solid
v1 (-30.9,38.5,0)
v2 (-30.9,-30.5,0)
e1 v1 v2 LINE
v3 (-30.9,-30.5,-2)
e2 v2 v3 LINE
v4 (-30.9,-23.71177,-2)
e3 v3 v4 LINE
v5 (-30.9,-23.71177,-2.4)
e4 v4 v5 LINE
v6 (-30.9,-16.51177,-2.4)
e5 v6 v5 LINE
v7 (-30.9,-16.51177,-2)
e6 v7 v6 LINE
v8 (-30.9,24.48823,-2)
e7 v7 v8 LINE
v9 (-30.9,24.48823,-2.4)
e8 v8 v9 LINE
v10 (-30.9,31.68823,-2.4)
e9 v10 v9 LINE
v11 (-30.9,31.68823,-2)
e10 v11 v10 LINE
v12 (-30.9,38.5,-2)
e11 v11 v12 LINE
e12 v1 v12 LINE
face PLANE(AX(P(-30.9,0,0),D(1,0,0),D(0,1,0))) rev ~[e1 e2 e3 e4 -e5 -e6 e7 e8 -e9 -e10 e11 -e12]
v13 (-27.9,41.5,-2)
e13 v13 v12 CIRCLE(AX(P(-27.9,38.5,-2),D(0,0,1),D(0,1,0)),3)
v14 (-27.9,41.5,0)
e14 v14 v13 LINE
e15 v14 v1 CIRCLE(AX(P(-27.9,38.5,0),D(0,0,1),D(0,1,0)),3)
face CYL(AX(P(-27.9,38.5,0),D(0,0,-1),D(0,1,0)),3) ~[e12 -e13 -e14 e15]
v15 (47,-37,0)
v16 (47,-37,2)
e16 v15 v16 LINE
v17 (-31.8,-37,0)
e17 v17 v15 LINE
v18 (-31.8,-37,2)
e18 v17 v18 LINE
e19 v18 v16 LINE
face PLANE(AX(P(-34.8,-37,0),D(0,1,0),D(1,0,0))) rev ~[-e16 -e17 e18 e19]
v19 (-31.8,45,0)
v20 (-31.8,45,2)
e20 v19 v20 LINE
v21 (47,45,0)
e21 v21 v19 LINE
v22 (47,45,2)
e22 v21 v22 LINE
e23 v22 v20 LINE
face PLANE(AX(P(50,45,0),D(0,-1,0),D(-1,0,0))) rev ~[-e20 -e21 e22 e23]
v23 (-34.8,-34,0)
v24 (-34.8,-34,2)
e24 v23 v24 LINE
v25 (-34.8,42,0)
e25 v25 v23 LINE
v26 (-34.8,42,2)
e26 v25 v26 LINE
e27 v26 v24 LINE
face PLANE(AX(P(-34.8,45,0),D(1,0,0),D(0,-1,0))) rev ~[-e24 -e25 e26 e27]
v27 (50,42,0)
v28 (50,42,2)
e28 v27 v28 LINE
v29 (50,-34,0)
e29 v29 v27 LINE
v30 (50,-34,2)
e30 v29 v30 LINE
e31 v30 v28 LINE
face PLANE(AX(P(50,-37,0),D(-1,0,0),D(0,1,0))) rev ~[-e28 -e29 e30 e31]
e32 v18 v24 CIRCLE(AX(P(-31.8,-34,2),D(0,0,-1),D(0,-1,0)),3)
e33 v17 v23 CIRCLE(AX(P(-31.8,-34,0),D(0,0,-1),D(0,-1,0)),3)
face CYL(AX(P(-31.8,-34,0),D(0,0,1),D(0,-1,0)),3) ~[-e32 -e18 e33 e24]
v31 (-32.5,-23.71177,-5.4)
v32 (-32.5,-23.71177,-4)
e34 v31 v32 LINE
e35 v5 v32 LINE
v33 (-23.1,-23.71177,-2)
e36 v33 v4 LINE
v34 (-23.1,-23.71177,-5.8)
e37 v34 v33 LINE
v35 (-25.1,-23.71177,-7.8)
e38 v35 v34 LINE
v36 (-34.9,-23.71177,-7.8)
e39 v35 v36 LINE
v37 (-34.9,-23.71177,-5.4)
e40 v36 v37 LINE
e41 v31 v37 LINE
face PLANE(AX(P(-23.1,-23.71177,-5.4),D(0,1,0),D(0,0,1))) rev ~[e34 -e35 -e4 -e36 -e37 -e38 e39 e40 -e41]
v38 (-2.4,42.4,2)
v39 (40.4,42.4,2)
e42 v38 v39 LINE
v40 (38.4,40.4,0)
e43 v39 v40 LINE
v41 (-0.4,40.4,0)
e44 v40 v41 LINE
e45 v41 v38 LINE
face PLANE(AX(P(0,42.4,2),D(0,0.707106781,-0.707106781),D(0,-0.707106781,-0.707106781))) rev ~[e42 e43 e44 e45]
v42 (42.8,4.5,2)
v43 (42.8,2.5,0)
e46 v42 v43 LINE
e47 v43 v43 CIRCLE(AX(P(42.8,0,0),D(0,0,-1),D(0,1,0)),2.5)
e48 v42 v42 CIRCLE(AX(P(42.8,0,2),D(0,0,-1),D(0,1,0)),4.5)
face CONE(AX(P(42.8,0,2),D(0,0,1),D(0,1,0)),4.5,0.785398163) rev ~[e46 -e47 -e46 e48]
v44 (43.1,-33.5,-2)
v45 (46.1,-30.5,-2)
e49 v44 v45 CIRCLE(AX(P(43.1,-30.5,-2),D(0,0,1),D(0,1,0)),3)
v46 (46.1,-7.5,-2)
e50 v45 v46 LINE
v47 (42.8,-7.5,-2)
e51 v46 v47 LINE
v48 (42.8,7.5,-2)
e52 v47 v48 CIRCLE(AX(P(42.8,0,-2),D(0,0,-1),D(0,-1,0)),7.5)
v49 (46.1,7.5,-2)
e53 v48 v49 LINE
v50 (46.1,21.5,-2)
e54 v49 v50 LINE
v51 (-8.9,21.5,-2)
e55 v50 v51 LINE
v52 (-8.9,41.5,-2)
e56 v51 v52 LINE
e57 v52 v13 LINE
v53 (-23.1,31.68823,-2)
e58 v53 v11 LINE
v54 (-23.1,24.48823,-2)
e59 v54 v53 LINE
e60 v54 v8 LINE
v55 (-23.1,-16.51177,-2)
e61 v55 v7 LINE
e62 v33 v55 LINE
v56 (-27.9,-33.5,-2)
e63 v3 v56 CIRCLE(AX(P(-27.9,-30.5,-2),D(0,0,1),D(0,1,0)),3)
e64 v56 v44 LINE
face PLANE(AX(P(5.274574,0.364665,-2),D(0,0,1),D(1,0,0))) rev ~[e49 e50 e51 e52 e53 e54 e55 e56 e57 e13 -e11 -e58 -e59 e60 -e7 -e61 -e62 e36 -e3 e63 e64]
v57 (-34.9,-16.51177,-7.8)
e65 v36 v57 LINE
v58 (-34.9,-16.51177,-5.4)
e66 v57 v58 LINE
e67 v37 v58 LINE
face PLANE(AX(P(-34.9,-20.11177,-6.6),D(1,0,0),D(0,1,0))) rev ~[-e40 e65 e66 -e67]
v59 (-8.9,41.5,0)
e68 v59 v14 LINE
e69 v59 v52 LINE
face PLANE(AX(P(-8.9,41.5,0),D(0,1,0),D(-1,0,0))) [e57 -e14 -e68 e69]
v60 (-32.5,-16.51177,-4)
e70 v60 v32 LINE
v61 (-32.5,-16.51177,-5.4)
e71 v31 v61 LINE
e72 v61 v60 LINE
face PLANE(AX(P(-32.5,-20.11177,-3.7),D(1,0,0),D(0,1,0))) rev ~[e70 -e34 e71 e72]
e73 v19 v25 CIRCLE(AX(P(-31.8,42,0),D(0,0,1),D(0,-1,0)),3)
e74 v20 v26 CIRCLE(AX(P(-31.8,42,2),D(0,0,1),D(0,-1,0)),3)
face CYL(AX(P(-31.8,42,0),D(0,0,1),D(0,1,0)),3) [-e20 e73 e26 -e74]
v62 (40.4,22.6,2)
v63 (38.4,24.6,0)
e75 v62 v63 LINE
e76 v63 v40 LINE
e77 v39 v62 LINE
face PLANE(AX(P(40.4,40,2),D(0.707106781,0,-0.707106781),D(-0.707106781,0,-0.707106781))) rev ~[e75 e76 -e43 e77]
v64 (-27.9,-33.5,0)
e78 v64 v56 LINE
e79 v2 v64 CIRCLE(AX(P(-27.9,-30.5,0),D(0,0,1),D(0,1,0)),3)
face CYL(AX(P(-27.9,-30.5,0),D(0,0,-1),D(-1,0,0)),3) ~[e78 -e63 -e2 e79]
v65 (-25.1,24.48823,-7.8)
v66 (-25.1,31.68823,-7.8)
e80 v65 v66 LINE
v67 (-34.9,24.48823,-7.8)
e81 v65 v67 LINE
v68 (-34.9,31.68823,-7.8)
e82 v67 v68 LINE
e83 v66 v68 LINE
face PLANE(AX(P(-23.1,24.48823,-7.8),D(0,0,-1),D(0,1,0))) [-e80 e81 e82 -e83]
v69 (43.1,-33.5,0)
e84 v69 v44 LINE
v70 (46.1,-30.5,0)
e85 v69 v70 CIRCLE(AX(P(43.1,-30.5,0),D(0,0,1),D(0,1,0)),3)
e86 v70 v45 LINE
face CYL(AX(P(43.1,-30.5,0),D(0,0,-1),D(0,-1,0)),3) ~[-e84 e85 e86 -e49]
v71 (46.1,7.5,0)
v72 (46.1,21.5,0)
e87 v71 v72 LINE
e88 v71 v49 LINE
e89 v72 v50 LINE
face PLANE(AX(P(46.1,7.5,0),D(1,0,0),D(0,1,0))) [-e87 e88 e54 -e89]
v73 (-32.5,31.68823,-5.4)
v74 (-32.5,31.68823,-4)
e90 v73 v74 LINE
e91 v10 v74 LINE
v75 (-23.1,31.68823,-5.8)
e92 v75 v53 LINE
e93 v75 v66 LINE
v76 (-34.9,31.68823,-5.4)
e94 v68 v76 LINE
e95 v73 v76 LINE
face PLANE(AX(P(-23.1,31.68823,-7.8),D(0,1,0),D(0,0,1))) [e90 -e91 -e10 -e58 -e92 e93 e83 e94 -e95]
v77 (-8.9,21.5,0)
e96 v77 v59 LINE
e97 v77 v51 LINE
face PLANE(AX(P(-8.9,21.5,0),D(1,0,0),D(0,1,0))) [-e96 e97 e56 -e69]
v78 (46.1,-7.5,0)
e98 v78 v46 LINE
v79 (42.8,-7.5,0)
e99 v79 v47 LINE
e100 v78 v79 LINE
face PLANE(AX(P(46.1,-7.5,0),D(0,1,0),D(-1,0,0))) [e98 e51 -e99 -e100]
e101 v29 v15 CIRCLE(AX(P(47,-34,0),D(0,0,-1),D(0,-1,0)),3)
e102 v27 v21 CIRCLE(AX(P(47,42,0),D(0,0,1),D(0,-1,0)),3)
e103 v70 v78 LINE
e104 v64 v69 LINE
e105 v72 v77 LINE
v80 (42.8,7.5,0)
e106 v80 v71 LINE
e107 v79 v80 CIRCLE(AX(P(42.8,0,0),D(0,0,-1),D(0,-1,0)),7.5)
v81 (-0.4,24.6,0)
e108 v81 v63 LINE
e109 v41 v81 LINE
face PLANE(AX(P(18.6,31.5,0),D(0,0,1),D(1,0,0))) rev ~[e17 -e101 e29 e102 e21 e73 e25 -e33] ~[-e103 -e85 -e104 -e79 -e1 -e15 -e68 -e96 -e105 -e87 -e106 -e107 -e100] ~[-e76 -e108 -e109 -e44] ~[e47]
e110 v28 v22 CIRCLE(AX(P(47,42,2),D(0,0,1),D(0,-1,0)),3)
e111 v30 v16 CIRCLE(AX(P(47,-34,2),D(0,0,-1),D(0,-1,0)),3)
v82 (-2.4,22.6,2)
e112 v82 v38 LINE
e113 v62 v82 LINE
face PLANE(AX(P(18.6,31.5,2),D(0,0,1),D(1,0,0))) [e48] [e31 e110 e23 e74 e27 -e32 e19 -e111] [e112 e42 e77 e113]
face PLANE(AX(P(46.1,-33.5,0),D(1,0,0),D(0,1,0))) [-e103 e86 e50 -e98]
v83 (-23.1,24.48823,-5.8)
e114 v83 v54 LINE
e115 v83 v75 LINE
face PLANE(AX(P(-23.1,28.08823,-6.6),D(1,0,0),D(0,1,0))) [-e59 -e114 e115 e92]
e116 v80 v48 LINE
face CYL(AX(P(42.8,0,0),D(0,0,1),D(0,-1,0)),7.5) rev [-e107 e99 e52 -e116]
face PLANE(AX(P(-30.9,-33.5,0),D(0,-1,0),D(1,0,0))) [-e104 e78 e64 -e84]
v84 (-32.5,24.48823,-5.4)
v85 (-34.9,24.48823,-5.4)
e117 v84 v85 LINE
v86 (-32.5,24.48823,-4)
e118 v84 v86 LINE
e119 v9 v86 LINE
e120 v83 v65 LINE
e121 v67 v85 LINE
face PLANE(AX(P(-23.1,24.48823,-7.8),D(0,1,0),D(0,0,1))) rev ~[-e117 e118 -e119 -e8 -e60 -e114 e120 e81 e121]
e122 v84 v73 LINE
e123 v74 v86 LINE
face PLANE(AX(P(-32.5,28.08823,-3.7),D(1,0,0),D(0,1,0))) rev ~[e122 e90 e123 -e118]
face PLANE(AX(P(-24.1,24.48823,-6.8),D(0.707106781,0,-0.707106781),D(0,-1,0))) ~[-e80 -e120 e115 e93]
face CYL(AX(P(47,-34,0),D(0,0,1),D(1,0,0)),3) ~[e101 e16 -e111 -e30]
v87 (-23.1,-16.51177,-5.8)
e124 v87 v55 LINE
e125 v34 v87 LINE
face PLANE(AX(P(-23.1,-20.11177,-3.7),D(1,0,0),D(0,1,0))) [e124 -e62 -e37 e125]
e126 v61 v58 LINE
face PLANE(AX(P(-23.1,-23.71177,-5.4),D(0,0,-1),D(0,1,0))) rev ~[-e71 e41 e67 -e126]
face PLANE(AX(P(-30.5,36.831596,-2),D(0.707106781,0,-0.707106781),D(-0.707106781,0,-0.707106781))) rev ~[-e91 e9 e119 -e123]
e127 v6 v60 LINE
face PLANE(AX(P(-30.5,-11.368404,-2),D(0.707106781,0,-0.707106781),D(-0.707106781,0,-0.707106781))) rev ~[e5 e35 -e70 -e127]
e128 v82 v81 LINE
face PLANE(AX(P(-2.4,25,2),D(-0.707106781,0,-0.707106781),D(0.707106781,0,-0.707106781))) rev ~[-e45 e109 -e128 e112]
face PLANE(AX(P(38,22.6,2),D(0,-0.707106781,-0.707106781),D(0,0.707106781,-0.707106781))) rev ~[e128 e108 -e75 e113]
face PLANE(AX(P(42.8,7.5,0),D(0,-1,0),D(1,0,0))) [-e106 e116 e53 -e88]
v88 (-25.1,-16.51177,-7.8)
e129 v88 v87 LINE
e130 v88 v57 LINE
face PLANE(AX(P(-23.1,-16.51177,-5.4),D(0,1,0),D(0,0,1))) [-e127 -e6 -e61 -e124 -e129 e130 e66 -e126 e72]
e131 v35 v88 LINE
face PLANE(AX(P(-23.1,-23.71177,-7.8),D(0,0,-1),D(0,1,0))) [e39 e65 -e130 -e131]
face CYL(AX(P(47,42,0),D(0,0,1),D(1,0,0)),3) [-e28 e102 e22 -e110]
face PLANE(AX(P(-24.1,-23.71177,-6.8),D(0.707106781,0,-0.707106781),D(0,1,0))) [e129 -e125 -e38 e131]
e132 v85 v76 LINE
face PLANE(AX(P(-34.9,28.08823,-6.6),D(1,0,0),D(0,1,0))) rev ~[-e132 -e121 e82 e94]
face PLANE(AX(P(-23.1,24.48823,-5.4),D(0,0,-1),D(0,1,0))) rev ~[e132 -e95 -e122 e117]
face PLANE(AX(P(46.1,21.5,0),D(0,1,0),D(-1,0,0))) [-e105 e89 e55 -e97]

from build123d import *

# Parameters (mm, degrees)
F1_DEPTH     = 2
F2_R         = 3
F0_W         = 55
F0_H         = 20
F0_W_2       = 38
F0_H_2       = 15
F3_DEPTH     = 2
F4_R         = 3
F5_T1_DEPTH  = 38
F5_T3_DEPTH  = 15
F5_T9_DEPTH  = 44.1720391711
F5_T13_DEPTH = 21.1720391711
F5_T20_DEPTH = 44.1720391711
F5_T24_DEPTH = 21.1720391711
F5_T31_DEPTH = 21.1720391711
F5_T35_DEPTH = 44.1720391711
F5_T42_DEPTH = 44.1720391711
F5_T46_DEPTH = 21.1720391711
F8_START     = -23.1
F7_W         = 7.2
F7_H         = 3.4
F8_DEPTH     = 9.4
F9_START     = -23.1
F7_H_2       = 2.4
F9_DEPTH     = 11.8
F10_SIZE     = 2
F11_T4_DEPTH = 17.4867319519
F11_T9_DEPTH = 17.4867319519


# Not quite as in the source:
# - a fillet or chamfer that OpenCascade refuses, or shapes differently, is made with other operations: its cross-section is extruded or revolved along the edge and cut away or added
# - a feature names something its author has since deleted; it is built from what else it names


with BuildPart() as f1:
    # F0 (on Top) → F1 (new body)
    with BuildSketch(Plane.XY):
        with BuildLine():
            Line((42.8, 7.5), (46.1, 7.5))
            Line((46.1, 7.5), (46.1, 21.5))
            Line((46.1, 21.5), (-8.9, 21.5))
            Line((-8.9, 21.5), (-8.9, 41.5))
            Line((-8.9, 41.5), (-30.9, 41.5))
            Line((-30.9, 41.5), (-30.9, -33.5))
            Line((-30.9, -33.5), (46.1, -33.5))
            Line((46.1, -33.5), (46.1, -7.5))
            Line((46.1, -7.5), (42.8, -7.5))
            ThreePointArc((42.8, -7.5), (35.3, 0), (42.8, 7.5))
        make_face()
    extrude(amount=-F1_DEPTH)

    # F2
    f2_edges = [f1.edges().sort_by_distance(p)[0] for p in [
        (46.1, -33.5, -1),
        (-30.9, -33.5, -1),
        (-30.9, 41.5, -1),
    ]]
    fillet(f2_edges, radius=F2_R)

    # F0 (on Top) → F3 (join)
    with BuildSketch(Plane.XY):
        with Locations((18.6, 31.5)):
            Rectangle(F0_W, F0_H)
        with Locations((19, 32.5)):
            Rectangle(F0_W_2, F0_H_2, mode=Mode.SUBTRACT)
        with BuildLine():
            Line((42.8, 7.5), (46.1, 7.5))
            Line((46.1, 7.5), (46.1, 21.5))
            Line((46.1, 21.5), (-8.9, 21.5))
            Line((-8.9, 21.5), (-8.9, 41.5))
            Line((-8.9, 41.5), (-30.9, 41.5))
            Line((-30.9, 41.5), (-30.9, -33.5))
            Line((-30.9, -33.5), (46.1, -33.5))
            Line((46.1, -33.5), (46.1, -7.5))
            Line((46.1, -7.5), (42.8, -7.5))
            ThreePointArc((42.8, -7.5), (35.3, 0), (42.8, 7.5))
        make_face()
        with BuildLine():
            Line((42.8, 1.5), (42.8, 7.5))
            ThreePointArc((42.8, 7.5), (35.3, 0), (42.8, -7.5))
            Line((42.8, -7.5), (42.8, -1.5))
            ThreePointArc((42.8, -1.5), (41.3, 0), (42.8, 1.5))
        make_face()
        with BuildLine():
            Line((46.1, -6.7349832962), (46.1, 6.7349832962))
            ThreePointArc((46.1, 6.7349832962), (44.4937569599, 7.3062430401), (42.8, 7.5))
            Line((42.8, 7.5), (42.8, 1.5))
            ThreePointArc((42.8, 1.5), (43.8606601718, 1.0606601718), (44.3, 0))
            ThreePointArc((44.3, 0), (43.8606601718, -1.0606601718), (42.8, -1.5))
            Line((42.8, -1.5), (42.8, -7.5))
            ThreePointArc((42.8, -7.5), (44.4937569599, -7.3062430401), (46.1, -6.7349832962))
        make_face()
        with BuildLine():
            Line((46.1, -7.5), (46.1, -6.7349832962))
            ThreePointArc((46.1, -6.7349832962), (44.4937569599, -7.3062430401), (42.8, -7.5))
            Line((42.8, -7.5), (46.1, -7.5))
        make_face()
        with BuildLine():
            Line((50, 45), (-34.8, 45))
            Line((-34.8, 45), (-34.8, -37))
            Line((-34.8, -37), (50, -37))
            Line((50, -37), (50, -2.1))
            ThreePointArc((50, -2.1), (48.538751392, -4.8287402561), (46.1, -6.7349832962))
            Line((46.1, -6.7349832962), (46.1, -7.5))
            Line((46.1, -7.5), (46.1, -33.5))
            Line((46.1, -33.5), (-30.9, -33.5))
            Line((-30.9, -33.5), (-30.9, 41.5))
            Line((-30.9, 41.5), (-8.9, 41.5))
            Line((-8.9, 41.5), (46.1, 41.5))
            Line((46.1, 41.5), (46.1, 21.5))
            Line((46.1, 21.5), (46.1, 7.5))
            Line((46.1, 7.5), (46.1, 6.7349832962))
            ThreePointArc((46.1, 6.7349832962), (48.538751392, 4.8287402561), (50, 2.1))
            Line((50, 2.1), (50, 45))
        make_face()
        with BuildLine():
            Line((50, -2.1), (50, 2.1))
            ThreePointArc((50, 2.1), (48.538751392, 4.8287402561), (46.1, 6.7349832962))
            Line((46.1, 6.7349832962), (46.1, -6.7349832962))
            ThreePointArc((46.1, -6.7349832962), (48.538751392, -4.8287402561), (50, -2.1))
        make_face()
        with BuildLine():
            ThreePointArc((42.8, 7.5), (44.4937569599, 7.3062430401), (46.1, 6.7349832962))
            Line((46.1, 6.7349832962), (46.1, 7.5))
            Line((46.1, 7.5), (42.8, 7.5))
        make_face()
    extrude(amount=F3_DEPTH)

    # F4
    f4_edges = [f1.edges().sort_by_distance(p)[0] for p in [
        (50, -37, 1),
        (-34.8, -37, 1),
        (-34.8, 45, 1),
        (50, 45, 1),
    ]]
    fillet(f4_edges, radius=F4_R)

    # F5: chamfer of 2.4 on 4 edges, made by hand

    # F5_s2 → F5_t1 (cut)
    with BuildSketch(Plane.YZ):
        Polygon((42.4, 2), (40, -0.4), (40, 2), align=None)
        Polygon((22.6, 2), (25, -0.4), (25, 2), align=None)
    extrude(amount=F5_T1_DEPTH, mode=Mode.SUBTRACT)

    # F5_s4 → F5_t3 (cut)
    with BuildSketch(Plane.XZ.offset(-40)):
        Polygon((40.4, 2), (38, -0.4), (38, 2), align=None)
        Polygon((-2.4, 2), (0, -0.4), (0, 2), align=None)
    extrude(amount=F5_T3_DEPTH, mode=Mode.SUBTRACT)


with BuildPart() as f5_tool7:
    # F5_s8 → F5_t9 (new body)
    with BuildSketch(Plane.YZ.offset(-6.1720391711)):
        Polygon((42.4, 2), (40, -0.4), (40, 2), align=None)
    extrude(amount=F5_T9_DEPTH)

    split(bisect_by=Plane.YZ, keep=Keep.BOTTOM)


with BuildPart() as f5_tool11:
    # F5_s12 → F5_t13 (new body)
    with BuildSketch(Plane.XZ.offset(-25)):
        Polygon((-2.4, 2), (0, -0.4), (0, 2), align=None)
    extrude(amount=-F5_T13_DEPTH)

    split(bisect_by=Plane.XZ.offset(-40), keep=Keep.BOTTOM)


with BuildPart() as f5_tool7_1:
    add(f5_tool7.part)

    # F5_t15: intersect F5_tool11
    add(f5_tool11.part, mode=Mode.INTERSECT)


with BuildPart() as f1_1:
    add(f1.part)

    # F5_t5: cut F5_tool7
    add(f5_tool7_1.part, mode=Mode.SUBTRACT)


with BuildPart() as f5_tool18:
    # F5_s19 → F5_t20 (new body)
    with BuildSketch(Plane.YZ):
        Polygon((42.4, 2), (40, -0.4), (40, 2), align=None)
    extrude(amount=F5_T20_DEPTH)

    split(bisect_by=Plane.YZ.offset(38), keep=Keep.TOP)


with BuildPart() as f5_tool22:
    # F5_s23 → F5_t24 (new body)
    with BuildSketch(Plane.XZ.offset(-46.1720391711)):
        Polygon((40.4, 2), (38, -0.4), (38, 2), align=None)
    extrude(amount=F5_T24_DEPTH)

    split(bisect_by=Plane.XZ.offset(-40), keep=Keep.BOTTOM)


with BuildPart() as f5_tool18_1:
    add(f5_tool18.part)

    # F5_t26: intersect F5_tool22
    add(f5_tool22.part, mode=Mode.INTERSECT)


with BuildPart() as f1_2:
    add(f1_1.part)

    # F5_t16: cut F5_tool18
    add(f5_tool18_1.part, mode=Mode.SUBTRACT)


with BuildPart() as f5_tool29:
    # F5_s30 → F5_t31 (new body)
    with BuildSketch(Plane.XZ.offset(-40)):
        Polygon((40.4, 2), (38, -0.4), (38, 2), align=None)
    extrude(amount=F5_T31_DEPTH)

    split(bisect_by=Plane.XZ.offset(-25), keep=Keep.TOP)


with BuildPart() as f5_tool33:
    # F5_s34 → F5_t35 (new body)
    with BuildSketch(Plane.YZ.offset(44.1720391711)):
        Polygon((22.6, 2), (25, -0.4), (25, 2), align=None)
    extrude(amount=-F5_T35_DEPTH)

    split(bisect_by=Plane.YZ.offset(38), keep=Keep.TOP)


with BuildPart() as f5_tool29_1:
    add(f5_tool29.part)

    # F5_t37: intersect F5_tool33
    add(f5_tool33.part, mode=Mode.INTERSECT)


with BuildPart() as f1_3:
    add(f1_2.part)

    # F5_t27: cut F5_tool29
    add(f5_tool29_1.part, mode=Mode.SUBTRACT)


with BuildPart() as f5_tool40:
    # F5_s41 → F5_t42 (new body)
    with BuildSketch(Plane.YZ.offset(38)):
        Polygon((22.6, 2), (25, -0.4), (25, 2), align=None)
    extrude(amount=-F5_T42_DEPTH)

    split(bisect_by=Plane.YZ, keep=Keep.BOTTOM)


with BuildPart() as f5_tool44:
    # F5_s45 → F5_t46 (new body)
    with BuildSketch(Plane.XZ.offset(-18.8279608289)):
        Polygon((-2.4, 2), (0, -0.4), (0, 2), align=None)
    extrude(amount=-F5_T46_DEPTH)

    split(bisect_by=Plane.XZ.offset(-25), keep=Keep.TOP)


with BuildPart() as f5_tool40_1:
    add(f5_tool40.part)

    # F5_t48: intersect F5_tool44
    add(f5_tool44.part, mode=Mode.INTERSECT)


with BuildPart() as f1_4:
    add(f1_3.part)

    # F5_t38: cut F5_tool40
    add(f5_tool40_1.part, mode=Mode.SUBTRACT)

    # F6: chamfer of 3 on 1 edges, made by hand

    # F6_s1 → F6_t2 (revolve, cut)
    with BuildSketch(Plane.YZ.offset(42.8)):
        Polygon((4.5, 2), (1.5, -1), (1.5, 2), align=None)
    revolve(axis=Axis((42.8, 0, 2), (0, 0, -1)), mode=Mode.SUBTRACT)

    # F7 (on Right) → F8 (join)
    with BuildSketch(Plane.YZ.offset(F8_START)):
        with Locations((28.0882296383, -3.7)):
            Rectangle(F7_W, F7_H)
        with Locations((-20.1117703617, -3.7)):
            Rectangle(F7_W, F7_H)
    extrude(amount=-F8_DEPTH)

    # F7 (on Right) → F9 (join)
    with BuildSketch(Plane.YZ.offset(F9_START)):
        with Locations((28.0882296383, -6.6)):
            Rectangle(F7_W, F7_H_2)
        with Locations((-20.1117703617, -6.6)):
            Rectangle(F7_W, F7_H_2)
    extrude(amount=-F9_DEPTH)

    # F10
    f10_edges = [f1_4.edges().sort_by_distance(p)[0] for p in [
        (-23.1, -20.11177, -7.8),
        (-23.1, 28.08823, -7.8),
    ]]
    chamfer(f10_edges, length=F10_SIZE)

    # F11: chamfer of 2 on 2 edges, made by hand


with BuildPart() as f11_tool2:
    # F11_s3 → F11_t4 (new body)
    with BuildSketch(Plane.XZ.offset(11.3684043857)):
        Polygon((-30.5, -2), (-32.5, -4), (-32.5, -2), align=None)
    extrude(amount=F11_T4_DEPTH)

    split(bisect_by=Plane.YZ.offset(-30.9), keep=Keep.BOTTOM)


with BuildPart() as f1_5:
    add(f1_4.part)

    # F11_t1: cut F11_tool2
    add(f11_tool2.part, mode=Mode.SUBTRACT)


with BuildPart() as f11_tool7:
    # F11_s8 → F11_t9 (new body)
    with BuildSketch(Plane.XZ.offset(-36.8315956143)):
        Polygon((-30.5, -2), (-32.5, -4), (-32.5, -2), align=None)
    extrude(amount=F11_T9_DEPTH)

    split(bisect_by=Plane.YZ.offset(-30.9), keep=Keep.BOTTOM)


with BuildPart() as f1_6:
    add(f1_5.part)

    # F11_t6: cut F11_tool7
    add(f11_tool7.part, mode=Mode.SUBTRACT)


solid = f1_6.part
